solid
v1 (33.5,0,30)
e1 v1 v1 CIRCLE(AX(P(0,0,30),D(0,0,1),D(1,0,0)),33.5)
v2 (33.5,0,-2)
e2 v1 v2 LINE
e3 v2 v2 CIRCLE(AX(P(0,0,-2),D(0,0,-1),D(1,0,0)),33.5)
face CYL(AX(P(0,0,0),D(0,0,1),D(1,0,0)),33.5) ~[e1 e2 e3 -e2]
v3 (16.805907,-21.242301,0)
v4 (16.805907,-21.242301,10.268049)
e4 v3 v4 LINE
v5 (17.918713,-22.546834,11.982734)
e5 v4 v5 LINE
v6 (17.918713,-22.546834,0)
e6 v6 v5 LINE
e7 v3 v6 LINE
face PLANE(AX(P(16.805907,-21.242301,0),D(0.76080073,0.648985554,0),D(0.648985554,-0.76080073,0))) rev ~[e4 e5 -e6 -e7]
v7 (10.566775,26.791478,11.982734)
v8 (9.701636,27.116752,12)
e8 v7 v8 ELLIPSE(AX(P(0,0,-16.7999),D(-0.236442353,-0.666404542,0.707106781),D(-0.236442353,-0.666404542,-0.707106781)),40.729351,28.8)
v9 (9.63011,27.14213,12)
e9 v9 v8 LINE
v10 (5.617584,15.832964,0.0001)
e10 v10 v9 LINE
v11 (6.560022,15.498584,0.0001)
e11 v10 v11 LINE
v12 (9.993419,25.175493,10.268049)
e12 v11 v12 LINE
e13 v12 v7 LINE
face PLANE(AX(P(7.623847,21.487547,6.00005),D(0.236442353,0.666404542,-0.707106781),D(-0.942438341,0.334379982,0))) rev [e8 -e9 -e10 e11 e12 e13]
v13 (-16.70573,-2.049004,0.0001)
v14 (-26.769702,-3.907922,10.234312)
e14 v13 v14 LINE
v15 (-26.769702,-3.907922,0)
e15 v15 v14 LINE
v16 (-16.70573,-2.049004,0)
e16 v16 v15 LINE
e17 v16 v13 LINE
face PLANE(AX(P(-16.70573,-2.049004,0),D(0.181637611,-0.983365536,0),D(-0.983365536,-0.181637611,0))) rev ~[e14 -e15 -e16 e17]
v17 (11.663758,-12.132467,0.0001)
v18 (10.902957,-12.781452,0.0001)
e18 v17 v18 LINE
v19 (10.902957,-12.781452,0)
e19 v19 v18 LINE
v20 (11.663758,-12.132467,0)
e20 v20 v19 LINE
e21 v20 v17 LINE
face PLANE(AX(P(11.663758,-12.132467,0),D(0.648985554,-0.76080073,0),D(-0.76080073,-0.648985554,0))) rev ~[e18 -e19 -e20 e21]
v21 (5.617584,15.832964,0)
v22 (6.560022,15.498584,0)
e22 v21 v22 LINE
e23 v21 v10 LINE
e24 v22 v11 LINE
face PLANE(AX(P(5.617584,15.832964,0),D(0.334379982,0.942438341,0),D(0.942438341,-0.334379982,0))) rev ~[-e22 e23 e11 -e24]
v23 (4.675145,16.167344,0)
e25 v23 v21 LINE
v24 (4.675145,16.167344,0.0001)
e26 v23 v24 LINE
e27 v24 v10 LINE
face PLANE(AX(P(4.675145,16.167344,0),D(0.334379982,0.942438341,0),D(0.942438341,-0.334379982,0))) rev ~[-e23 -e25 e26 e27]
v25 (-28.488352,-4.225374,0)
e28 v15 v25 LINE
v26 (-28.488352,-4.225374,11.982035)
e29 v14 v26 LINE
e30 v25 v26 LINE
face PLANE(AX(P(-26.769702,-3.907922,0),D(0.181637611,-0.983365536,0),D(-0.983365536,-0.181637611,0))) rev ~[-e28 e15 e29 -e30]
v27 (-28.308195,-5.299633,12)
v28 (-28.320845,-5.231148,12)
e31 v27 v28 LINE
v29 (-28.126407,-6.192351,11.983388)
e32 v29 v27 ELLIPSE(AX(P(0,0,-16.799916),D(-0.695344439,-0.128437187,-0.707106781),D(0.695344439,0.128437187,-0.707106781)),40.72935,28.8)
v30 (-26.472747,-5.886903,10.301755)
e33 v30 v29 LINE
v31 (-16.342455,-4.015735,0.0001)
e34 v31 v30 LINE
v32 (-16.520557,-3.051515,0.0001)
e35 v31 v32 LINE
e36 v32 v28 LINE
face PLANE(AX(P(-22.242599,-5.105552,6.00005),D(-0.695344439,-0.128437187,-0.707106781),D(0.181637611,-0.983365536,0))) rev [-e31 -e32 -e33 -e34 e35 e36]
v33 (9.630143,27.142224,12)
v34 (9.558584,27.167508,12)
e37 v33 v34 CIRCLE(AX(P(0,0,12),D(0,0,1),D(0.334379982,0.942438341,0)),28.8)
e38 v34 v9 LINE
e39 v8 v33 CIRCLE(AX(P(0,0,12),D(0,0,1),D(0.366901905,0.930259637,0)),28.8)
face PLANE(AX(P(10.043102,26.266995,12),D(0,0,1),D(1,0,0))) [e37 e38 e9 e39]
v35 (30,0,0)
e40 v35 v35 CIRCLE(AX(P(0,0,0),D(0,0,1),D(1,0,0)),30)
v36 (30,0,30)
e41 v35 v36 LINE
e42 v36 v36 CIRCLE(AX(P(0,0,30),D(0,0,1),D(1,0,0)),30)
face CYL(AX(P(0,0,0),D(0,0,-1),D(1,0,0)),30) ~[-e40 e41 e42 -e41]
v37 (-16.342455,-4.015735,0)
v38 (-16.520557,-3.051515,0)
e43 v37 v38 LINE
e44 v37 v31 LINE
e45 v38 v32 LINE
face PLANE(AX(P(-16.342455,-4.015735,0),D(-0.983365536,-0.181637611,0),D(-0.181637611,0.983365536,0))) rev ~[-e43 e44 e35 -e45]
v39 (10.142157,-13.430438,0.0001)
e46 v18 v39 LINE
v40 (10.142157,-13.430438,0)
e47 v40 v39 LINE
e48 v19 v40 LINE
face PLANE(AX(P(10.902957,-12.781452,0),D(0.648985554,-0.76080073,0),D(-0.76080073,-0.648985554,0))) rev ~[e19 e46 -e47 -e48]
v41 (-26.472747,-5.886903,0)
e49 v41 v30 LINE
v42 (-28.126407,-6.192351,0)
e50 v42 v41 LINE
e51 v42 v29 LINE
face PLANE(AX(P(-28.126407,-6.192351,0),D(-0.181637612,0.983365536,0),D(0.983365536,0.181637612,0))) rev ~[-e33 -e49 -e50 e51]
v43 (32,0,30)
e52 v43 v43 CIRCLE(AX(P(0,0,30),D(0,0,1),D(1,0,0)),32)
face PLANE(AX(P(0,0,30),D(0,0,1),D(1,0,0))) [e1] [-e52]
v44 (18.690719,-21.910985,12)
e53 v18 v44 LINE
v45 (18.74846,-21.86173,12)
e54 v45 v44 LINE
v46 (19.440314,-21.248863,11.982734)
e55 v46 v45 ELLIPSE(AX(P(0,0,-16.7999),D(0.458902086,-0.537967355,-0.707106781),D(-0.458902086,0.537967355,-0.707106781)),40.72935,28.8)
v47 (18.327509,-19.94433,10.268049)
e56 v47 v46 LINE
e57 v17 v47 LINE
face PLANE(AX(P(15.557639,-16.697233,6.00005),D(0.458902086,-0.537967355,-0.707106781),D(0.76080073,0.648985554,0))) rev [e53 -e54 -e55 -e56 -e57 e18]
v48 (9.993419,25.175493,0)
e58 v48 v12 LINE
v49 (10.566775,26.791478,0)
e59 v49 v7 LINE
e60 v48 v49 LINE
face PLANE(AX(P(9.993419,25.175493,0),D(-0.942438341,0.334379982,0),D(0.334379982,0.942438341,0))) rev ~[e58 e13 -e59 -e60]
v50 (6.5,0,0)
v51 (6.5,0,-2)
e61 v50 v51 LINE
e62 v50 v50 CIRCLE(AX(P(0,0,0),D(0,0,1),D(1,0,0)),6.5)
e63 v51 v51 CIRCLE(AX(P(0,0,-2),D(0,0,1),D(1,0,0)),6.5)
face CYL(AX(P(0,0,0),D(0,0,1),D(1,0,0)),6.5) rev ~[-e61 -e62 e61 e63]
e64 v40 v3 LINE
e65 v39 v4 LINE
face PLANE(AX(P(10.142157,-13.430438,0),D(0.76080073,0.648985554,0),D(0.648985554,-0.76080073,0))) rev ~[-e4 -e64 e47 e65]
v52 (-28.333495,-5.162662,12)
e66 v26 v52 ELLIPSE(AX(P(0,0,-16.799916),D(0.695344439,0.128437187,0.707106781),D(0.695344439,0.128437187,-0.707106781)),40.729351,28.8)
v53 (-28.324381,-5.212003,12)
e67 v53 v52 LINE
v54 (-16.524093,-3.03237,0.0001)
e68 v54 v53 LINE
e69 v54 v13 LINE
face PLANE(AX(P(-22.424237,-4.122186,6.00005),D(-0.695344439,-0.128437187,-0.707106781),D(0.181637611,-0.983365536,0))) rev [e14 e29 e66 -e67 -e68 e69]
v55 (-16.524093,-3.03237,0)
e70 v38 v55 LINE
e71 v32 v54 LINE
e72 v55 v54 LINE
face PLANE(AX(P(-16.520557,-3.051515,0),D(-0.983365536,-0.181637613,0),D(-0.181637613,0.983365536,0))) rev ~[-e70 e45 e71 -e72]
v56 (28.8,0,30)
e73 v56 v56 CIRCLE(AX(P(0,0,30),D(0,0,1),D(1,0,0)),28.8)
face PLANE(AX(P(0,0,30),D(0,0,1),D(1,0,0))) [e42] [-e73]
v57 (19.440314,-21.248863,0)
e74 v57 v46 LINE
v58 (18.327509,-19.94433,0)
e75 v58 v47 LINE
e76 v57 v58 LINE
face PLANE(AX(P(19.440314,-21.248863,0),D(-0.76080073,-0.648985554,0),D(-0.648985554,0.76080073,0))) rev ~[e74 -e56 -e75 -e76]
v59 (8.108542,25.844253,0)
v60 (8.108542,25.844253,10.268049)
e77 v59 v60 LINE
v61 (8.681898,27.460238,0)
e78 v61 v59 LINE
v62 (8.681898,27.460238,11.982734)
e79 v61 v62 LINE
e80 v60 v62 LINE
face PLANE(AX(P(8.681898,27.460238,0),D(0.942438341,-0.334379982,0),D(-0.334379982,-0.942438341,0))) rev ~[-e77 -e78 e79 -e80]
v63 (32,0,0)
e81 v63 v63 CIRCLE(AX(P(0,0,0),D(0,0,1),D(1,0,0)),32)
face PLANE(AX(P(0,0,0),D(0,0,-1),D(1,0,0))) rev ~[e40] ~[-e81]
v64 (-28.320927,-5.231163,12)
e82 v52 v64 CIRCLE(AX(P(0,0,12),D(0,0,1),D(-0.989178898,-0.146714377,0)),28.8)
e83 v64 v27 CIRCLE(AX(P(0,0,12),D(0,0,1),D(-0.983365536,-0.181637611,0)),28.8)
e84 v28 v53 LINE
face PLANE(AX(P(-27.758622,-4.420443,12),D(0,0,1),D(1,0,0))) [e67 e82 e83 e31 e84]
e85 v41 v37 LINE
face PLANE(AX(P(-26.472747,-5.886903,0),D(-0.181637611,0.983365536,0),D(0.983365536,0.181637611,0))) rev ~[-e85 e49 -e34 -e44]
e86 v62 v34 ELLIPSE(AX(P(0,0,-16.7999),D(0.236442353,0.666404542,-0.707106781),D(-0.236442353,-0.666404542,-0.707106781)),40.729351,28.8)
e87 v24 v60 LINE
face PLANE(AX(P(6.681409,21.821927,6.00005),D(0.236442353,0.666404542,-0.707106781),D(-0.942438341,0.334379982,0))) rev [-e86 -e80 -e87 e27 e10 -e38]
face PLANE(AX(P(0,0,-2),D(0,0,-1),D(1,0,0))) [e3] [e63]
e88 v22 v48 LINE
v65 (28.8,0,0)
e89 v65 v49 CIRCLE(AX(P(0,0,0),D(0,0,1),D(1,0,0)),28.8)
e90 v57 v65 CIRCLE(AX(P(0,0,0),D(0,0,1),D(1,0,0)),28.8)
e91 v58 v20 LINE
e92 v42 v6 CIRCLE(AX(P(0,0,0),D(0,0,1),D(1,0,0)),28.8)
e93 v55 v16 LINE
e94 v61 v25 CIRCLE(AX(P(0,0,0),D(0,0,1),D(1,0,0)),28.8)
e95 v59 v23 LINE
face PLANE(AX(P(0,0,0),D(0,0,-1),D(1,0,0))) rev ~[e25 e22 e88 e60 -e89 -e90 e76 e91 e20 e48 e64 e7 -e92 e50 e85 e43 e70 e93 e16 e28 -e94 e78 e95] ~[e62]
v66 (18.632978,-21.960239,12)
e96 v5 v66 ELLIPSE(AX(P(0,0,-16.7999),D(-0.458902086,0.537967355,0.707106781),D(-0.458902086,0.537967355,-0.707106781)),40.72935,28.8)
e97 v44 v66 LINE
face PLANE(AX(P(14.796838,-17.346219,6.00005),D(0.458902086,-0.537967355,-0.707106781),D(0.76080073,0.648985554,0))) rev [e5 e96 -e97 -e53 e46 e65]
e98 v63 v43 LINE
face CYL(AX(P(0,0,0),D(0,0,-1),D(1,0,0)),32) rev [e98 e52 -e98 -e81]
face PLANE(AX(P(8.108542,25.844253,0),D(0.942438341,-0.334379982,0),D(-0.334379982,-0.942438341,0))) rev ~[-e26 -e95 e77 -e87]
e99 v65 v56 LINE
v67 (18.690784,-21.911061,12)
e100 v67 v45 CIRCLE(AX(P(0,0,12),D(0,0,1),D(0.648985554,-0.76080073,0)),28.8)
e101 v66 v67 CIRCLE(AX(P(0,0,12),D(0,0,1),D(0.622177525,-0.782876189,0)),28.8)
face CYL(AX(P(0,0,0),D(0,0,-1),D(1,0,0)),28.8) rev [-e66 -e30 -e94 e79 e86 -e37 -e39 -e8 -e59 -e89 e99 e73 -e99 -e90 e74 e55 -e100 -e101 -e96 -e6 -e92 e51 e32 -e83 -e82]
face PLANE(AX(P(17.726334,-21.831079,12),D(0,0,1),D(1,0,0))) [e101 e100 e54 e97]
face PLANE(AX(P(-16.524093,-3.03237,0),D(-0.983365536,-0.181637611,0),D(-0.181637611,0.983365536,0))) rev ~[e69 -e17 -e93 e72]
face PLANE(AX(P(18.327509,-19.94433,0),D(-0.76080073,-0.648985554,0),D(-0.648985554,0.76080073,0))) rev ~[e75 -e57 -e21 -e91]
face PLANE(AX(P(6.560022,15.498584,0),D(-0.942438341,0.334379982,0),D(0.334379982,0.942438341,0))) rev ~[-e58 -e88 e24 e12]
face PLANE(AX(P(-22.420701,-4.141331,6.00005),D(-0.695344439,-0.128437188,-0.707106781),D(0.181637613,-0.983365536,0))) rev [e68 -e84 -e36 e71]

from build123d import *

# Parameters (mm, degrees)
F0_R      = 33.5
F0_R_2    = 32
F1_DEPTH  = 30
F0_R_3    = 30
F0_R_4    = 28.8
F2_R      = 33.5
F3_DEPTH  = 2
F5_DEPTH  = 12
F6_SIZE   = 11.9999
F6_2_SIZE = 11.9999
F6_3_SIZE = 11.9999
F8_R      = 6.5
F9_DEPTH  = 25


# Not quite as in the source:
# - a fillet or chamfer is up to 0.001 mm smaller than in the source, because OpenCascade refuses the exact size


with BuildPart() as f1:
    # F0 (on Top) → F1 (new body)
    with BuildSketch(Plane.XY):
        Circle(F0_R)
        Circle(F0_R_2, mode=Mode.SUBTRACT)
    extrude(amount=F1_DEPTH)


with BuildPart() as f1b:
    # F0 (on Top) → F1, piece 2 (new body)
    with BuildSketch(Plane.XY):
        Circle(F0_R_3)
        Circle(F0_R_4, mode=Mode.SUBTRACT)
    extrude(amount=F1_DEPTH)


with BuildPart() as f3:
    # F2 (on face) → F3 (new body)
    with BuildSketch(Plane(origin=(0, 0, 0), x_dir=(1, 0, 0), z_dir=(0, 0, -1))):
        Circle(F2_R)
    extrude(amount=F3_DEPTH)


with BuildPart() as f5:
    # F4 (on face) → F5 (new body)
    with BuildSketch(Plane.XY):
        with BuildLine():
            Line((9.993418715, 25.1754931604), (10.5667748746, 26.7914775395))
            ThreePointArc((10.5667748746, 26.7914775395), (10.0999818657, 26.9709170462), (9.630143492, 27.1422242332))
            Line((9.630143492, 27.1422242332), (9.993418715, 25.1754931604))
        make_face()
        with BuildLine():
            Line((8.1085420321, 25.8442531252), (9.630143492, 27.1422242332))
            ThreePointArc((9.630143492, 27.1422242332), (9.15740142, 27.3053474476), (8.6818981918, 27.4602375042))
            Line((8.6818981918, 27.4602375042), (8.1085420321, 25.8442531252))
        make_face()
        Polygon((9.993418715, 25.1754931604), (9.630143492, 27.1422242332), (5.6175837037, 15.832964136), (6.5600220451, 15.4985841536), align=None)
        Polygon((5.6175837037, 15.832964136), (9.630143492, 27.1422242332), (8.1085420321, 25.8442531252), (4.6751453622, 16.1673441184), align=None)
    extrude(amount=F5_DEPTH)

    # F6#2 (size 12 in the source; OpenCascade refuses exactly that, so slightly less here)
    f6_2_edges = [f5.edges().sort_by_distance(p)[0] for p in [
        (5.617584, 15.832964, 12),
    ]]
    chamfer(f6_2_edges, length=F6_2_SIZE)


with BuildPart() as f5b:
    # F4 (on face) → F5, piece 2 (new body)
    with BuildSketch(Plane.XY):
        with BuildLine():
            Line((-26.769701888, -3.9079218685), (-28.488352252, -4.2253740625))
            ThreePointArc((-28.488352252, -4.2253740625), (-28.4090912902, -4.7290096283), (-28.3209274471, -5.2311632104))
            Line((-28.3209274471, -5.2311632104), (-26.769701888, -3.9079218685))
        make_face()
        with BuildLine():
            ThreePointArc((-28.3209274471, -5.2311632104), (-28.2277588918, -5.7125850495), (-28.1264073572, -6.1923508604))
            Line((-28.1264073572, -6.1923508604), (-26.4727474785, -5.8869030696))
            Line((-26.4727474785, -5.8869030696), (-28.3209274471, -5.2311632104))
        make_face()
        Polygon((-16.7057304605, -2.0490040353), (-26.769701888, -3.9079218685), (-28.3209274471, -5.2311632104), (-16.5205565416, -3.0515147414), (-16.5240928491, -3.0323695717), align=None)
        Polygon((-28.3209274471, -5.2311632104), (-26.4727474785, -5.8869030696), (-16.3424552376, -4.0157351081), (-16.5205565416, -3.0515147414), align=None)
    extrude(amount=F5_DEPTH)

    # F6 (size 12 in the source; OpenCascade refuses exactly that, so slightly less here)
    f6_edges = [f5b.edges().sort_by_distance(p)[0] for p in [
        (-16.524093, -3.03237, 12),
    ]]
    chamfer(f6_edges, length=F6_SIZE)


with BuildPart() as f5c:
    # F4 (on face) → F5, piece 3 (new body)
    with BuildSketch(Plane.XY):
        with BuildLine():
            ThreePointArc((17.9187127168, -22.5468342472), (18.3075083925, -22.2322993966), (18.6907839551, -21.9110610228))
            Line((18.6907839551, -21.9110610228), (16.8059072723, -21.242301058))
            Line((16.8059072723, -21.242301058), (17.9187127168, -22.5468342472))
        make_face()
        with BuildLine():
            ThreePointArc((18.6907839551, -21.9110610228), (19.0684238388, -21.5832159862), (19.4403141767, -21.2488631392))
            Line((19.4403141767, -21.2488631392), (18.3275087322, -19.94432995))
            Line((18.3275087322, -19.94432995), (18.6907839551, -21.9110610228))
        make_face()
        Polygon((10.9029573072, -12.7814522633), (18.6907839551, -21.9110610228), (18.3275087322, -19.94432995), (11.6637580371, -12.1324667093), align=None)
        Polygon((16.8059072723, -21.242301058), (18.6907839551, -21.9110610228), (10.9029573072, -12.7814522633), (10.1421565772, -13.4304378173), align=None)
    extrude(amount=F5_DEPTH)

    # F6#3 (size 12 in the source; OpenCascade refuses exactly that, so slightly less here)
    f6_3_edges = [f5c.edges().sort_by_distance(p)[0] for p in [
        (10.902957, -12.781452, 12),
    ]]
    chamfer(f6_3_edges, length=F6_3_SIZE)


with BuildPart() as f5_1:
    add(f5.part)

    # F7: union F1b, F1, F3, F5b, F5c
    add(f1b.part)
    add(f1.part)
    add(f3.part)
    add(f5b.part)
    add(f5c.part)

    # F8 (on face) → F9 (cut)
    with BuildSketch(Plane.XY):
        Circle(F8_R)
    extrude(amount=-F9_DEPTH, mode=Mode.SUBTRACT)


solid = f5_1.part
